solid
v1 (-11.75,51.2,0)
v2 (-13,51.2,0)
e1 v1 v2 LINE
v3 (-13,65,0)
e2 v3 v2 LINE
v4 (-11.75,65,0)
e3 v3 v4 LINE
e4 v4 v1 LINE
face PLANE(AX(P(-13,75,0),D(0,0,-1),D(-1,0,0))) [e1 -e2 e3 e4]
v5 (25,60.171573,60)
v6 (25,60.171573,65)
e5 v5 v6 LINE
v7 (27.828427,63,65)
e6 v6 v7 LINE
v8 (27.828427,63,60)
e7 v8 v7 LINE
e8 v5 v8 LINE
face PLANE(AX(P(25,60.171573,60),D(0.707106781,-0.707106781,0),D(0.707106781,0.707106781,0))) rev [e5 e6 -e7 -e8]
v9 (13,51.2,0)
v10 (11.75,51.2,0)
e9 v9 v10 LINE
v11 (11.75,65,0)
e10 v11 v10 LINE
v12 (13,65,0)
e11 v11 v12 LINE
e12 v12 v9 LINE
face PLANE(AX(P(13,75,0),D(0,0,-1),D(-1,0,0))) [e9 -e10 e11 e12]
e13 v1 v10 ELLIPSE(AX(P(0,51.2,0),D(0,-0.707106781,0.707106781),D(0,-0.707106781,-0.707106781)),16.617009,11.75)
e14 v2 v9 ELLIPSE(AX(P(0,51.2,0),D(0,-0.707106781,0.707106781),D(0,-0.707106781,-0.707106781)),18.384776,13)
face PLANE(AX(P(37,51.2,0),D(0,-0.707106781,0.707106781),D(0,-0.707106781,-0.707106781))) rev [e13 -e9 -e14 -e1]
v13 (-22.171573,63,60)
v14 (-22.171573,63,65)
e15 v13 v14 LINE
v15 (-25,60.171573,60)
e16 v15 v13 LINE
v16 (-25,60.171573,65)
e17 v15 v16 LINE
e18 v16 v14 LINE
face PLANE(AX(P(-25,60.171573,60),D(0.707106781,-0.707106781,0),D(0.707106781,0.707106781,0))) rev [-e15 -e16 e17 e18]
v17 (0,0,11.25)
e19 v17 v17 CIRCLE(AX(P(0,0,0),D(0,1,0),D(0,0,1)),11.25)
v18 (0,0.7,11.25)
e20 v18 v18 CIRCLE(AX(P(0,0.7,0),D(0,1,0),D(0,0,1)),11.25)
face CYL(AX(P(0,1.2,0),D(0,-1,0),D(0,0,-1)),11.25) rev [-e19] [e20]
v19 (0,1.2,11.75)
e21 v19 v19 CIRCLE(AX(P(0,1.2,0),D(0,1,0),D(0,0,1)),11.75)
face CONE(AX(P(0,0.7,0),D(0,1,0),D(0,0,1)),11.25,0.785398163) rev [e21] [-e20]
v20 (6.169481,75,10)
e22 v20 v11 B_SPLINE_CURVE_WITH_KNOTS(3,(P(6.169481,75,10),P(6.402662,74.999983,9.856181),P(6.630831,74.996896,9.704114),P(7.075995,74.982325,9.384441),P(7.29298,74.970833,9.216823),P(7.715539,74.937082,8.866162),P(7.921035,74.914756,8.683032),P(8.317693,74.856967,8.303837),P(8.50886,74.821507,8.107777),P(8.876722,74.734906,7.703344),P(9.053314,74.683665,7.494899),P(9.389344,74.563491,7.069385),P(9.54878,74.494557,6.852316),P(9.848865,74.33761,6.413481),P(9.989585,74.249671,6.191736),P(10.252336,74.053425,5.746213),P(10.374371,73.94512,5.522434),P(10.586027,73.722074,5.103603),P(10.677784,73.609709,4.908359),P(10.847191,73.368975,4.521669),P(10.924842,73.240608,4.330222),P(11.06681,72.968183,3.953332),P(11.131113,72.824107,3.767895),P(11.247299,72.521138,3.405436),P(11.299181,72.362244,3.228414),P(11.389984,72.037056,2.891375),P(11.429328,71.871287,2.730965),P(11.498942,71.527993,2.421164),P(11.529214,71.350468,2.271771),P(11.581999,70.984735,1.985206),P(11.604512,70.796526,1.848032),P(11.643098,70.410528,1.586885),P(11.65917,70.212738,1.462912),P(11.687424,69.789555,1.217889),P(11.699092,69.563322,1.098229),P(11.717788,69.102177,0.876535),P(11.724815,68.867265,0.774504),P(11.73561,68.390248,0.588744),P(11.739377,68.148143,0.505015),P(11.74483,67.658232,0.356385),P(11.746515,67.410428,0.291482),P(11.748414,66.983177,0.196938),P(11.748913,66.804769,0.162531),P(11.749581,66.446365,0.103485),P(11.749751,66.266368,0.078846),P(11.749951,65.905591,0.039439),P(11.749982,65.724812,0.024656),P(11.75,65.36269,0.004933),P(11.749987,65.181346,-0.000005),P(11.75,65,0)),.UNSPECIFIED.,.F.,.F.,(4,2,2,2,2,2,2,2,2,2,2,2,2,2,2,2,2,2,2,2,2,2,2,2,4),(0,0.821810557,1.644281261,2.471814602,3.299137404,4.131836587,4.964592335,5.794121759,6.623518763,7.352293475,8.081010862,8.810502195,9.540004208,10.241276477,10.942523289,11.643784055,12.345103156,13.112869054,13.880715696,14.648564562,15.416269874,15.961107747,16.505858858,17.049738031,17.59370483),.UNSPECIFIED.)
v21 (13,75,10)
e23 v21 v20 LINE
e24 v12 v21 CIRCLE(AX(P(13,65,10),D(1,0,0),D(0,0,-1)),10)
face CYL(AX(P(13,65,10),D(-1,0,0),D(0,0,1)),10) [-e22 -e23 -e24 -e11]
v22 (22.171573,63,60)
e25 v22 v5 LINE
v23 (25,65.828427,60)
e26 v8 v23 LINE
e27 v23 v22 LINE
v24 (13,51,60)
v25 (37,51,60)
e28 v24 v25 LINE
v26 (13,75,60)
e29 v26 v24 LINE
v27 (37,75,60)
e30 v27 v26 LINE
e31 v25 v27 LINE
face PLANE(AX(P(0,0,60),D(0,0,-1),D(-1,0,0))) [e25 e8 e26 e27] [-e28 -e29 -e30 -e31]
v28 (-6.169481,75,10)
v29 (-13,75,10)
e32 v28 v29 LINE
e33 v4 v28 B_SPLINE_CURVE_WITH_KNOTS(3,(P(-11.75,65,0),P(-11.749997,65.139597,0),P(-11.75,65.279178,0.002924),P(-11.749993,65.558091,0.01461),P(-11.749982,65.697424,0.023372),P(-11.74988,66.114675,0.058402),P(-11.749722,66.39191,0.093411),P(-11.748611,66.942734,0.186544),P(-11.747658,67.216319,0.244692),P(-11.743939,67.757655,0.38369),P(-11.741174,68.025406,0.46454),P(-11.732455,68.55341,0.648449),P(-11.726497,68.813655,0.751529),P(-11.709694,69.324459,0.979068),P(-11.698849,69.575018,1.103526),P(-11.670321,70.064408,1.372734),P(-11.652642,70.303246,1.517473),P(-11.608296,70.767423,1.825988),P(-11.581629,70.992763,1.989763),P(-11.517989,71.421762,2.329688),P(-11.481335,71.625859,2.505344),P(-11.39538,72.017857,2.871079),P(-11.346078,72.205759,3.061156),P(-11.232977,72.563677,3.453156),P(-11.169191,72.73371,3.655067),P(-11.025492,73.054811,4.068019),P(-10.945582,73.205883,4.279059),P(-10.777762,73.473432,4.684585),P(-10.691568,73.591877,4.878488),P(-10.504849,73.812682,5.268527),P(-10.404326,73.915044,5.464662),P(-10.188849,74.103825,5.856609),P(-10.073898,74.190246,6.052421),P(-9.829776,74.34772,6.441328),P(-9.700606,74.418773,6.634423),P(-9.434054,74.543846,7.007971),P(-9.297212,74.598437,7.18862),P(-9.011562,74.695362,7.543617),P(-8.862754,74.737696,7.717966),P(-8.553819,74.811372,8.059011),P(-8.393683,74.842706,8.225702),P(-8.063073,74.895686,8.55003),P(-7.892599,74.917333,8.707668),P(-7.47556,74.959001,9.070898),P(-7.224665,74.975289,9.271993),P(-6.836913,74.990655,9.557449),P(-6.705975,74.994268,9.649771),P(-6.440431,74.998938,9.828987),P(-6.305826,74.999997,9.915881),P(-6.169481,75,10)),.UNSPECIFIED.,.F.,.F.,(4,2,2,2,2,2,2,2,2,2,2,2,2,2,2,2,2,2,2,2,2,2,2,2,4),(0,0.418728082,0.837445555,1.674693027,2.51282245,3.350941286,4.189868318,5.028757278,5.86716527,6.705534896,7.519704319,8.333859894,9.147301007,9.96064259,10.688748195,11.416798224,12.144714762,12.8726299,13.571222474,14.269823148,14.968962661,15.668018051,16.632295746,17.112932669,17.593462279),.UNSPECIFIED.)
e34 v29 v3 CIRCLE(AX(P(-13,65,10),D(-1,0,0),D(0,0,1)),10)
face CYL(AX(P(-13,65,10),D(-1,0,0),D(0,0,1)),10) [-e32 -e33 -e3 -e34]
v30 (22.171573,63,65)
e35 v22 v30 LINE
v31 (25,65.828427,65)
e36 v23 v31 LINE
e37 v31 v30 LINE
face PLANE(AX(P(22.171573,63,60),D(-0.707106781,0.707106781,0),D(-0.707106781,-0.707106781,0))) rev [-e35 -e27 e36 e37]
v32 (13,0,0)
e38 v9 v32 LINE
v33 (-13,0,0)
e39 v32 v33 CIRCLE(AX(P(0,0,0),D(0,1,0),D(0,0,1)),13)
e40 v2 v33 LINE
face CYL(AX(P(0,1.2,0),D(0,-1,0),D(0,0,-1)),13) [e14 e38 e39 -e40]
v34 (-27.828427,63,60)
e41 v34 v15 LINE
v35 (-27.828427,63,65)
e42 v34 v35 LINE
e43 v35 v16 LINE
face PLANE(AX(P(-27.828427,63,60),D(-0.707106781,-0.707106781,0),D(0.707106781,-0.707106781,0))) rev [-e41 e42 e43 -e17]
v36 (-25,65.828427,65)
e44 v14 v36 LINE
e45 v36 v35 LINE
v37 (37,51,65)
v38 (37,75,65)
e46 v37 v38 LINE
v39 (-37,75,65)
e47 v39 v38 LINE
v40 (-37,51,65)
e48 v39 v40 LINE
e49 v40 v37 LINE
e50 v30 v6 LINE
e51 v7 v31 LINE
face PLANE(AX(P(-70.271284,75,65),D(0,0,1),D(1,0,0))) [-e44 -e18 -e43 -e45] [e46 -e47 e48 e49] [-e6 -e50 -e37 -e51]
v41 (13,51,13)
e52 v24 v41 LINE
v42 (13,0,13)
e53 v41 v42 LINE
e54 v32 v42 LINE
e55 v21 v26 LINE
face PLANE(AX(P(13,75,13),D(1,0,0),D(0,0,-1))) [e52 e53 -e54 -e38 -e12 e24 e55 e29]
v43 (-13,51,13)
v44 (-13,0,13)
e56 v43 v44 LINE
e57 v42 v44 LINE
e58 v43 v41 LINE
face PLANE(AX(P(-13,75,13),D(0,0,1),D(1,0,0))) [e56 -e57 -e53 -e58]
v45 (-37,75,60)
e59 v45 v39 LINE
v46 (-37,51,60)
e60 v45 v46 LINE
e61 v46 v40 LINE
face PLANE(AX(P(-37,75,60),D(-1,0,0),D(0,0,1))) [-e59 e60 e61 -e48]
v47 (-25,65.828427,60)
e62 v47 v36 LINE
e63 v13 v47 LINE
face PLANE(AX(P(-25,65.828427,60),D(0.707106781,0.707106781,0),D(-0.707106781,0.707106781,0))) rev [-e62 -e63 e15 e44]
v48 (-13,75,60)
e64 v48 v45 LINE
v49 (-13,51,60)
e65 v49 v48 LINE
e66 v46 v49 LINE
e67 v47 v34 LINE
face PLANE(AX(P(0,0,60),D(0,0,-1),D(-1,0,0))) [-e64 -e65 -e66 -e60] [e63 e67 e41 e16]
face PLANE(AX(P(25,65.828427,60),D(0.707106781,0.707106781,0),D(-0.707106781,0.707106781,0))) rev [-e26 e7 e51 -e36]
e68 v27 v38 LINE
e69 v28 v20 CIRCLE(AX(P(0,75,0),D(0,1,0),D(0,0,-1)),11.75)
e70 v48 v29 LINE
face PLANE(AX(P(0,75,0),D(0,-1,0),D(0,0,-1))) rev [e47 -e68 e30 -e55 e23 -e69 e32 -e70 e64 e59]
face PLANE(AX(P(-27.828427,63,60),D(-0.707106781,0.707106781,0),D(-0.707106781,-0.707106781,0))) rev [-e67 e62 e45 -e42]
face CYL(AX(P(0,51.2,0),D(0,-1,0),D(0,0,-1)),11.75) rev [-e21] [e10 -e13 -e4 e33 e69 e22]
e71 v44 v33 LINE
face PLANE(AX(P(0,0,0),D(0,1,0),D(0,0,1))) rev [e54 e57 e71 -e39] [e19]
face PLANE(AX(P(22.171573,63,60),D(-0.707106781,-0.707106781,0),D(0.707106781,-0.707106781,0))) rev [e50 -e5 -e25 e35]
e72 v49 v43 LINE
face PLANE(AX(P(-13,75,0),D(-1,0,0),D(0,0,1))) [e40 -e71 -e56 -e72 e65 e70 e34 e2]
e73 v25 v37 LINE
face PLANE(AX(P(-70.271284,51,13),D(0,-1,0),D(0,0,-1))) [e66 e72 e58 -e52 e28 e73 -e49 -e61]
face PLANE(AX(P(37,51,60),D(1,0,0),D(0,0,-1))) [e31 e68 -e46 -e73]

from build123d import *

# Parameters (mm, degrees)
SKETCH1_R           = 13
SKETCH1_R_2         = 11.25
BOSS_EXTRUDE1_DEPTH = 1.2
SKETCH2_R           = 13
SKETCH2_R_2         = 11.75
BOSS_EXTRUDE2_DEPTH = 50
CHAMFER1_SIZE       = 0.5
BOSS_EXTRUDE3_DEPTH = 75
SKETCH4_W           = 52
SKETCH4_H           = 24
BOSS_EXTRUDE4_DEPTH = 26
SKETCH5_W           = 24
SKETCH5_H           = 24
BOSS_EXTRUDE5_DEPTH = 5
CUT_EXTRUDE1_DEPTH  = 112.130553854
FILLET1_R           = 10


with BuildPart() as part:
    # Sketch1 → Boss-Extrude1 (new body)
    with BuildSketch(Plane(origin=(0, 0, 0), x_dir=(1, 0, 0), z_dir=(0, 1, 0))):
        with Locations(Location((0, 0, 0), (0, 0, 270))):
            Circle(SKETCH1_R)
        with Locations(Location((0, 0, 0), (0, 0, 270))):
            Circle(SKETCH1_R_2, mode=Mode.SUBTRACT)
    extrude(amount=BOSS_EXTRUDE1_DEPTH)

    # Sketch2 → Boss-Extrude2 (add)
    with BuildSketch(Plane(origin=(0, 1.2, 0), x_dir=(1, 0, 0), z_dir=(0, 1, 0))):
        with Locations(Location((0, 0, 0), (0, 0, 270))):
            Circle(SKETCH2_R)
        with Locations(Location((0, 0, 0), (0, 0, 270))):
            Circle(SKETCH2_R_2, mode=Mode.SUBTRACT)
    extrude(amount=BOSS_EXTRUDE2_DEPTH)

    # Chamfer1
    chamfer1_edges = [part.edges().sort_by_distance(p)[0] for p in [
        (0, 1.2, -11.25),
    ]]
    chamfer(chamfer1_edges, length=CHAMFER1_SIZE - 0.0001)  # a hair under: the kernel refuses the full size

    # Sketch3 → Boss-Extrude3 (add)
    with BuildSketch(Plane.XZ):
        with BuildLine():
            Line((-13, 0), (-13, 13))
            Line((-13, 13), (0, 13))
            Line((0, 13), (13, 13))
            Line((13, 13), (13, 0))
            Line((13, 0), (11.75, 0))
            ThreePointArc((11.75, 0), (0, 11.75), (-11.75, 0))
            Line((-11.75, 0), (-13, 0))
        make_face()
    extrude(amount=-BOSS_EXTRUDE3_DEPTH)

    # Sketch4 → Boss-Extrude4 (add)
    with BuildSketch(Plane(origin=(13, 0, 0), x_dir=(0, 0, -1), z_dir=(1, 0, 0))):
        with Locations((-39, 63)):
            Rectangle(SKETCH4_W, SKETCH4_H)
    extrude(amount=-BOSS_EXTRUDE4_DEPTH)

    # Sketch5 → Boss-Extrude5 (add)
    # profile 1 of 2: a face of its own
    with BuildSketch(Plane.XY.offset(65)):
        with Locations((-25, 63)):
            Rectangle(SKETCH5_W, SKETCH5_H)
        Polygon((-27.828427125, 63), (-25, 65.828427125), (-22.171572875, 63), (-25, 60.171572875), align=None, mode=Mode.SUBTRACT)
    # profile 2 of 2: a face of its own
    with BuildSketch(Plane.XY.offset(65)):
        with Locations((25, 63)):
            Rectangle(SKETCH5_W, SKETCH5_H)
        Polygon((22.171572875, 63), (25, 65.828427125), (27.828427125, 63), (25, 60.171572875), align=None, mode=Mode.SUBTRACT)
    extrude(amount=-BOSS_EXTRUDE5_DEPTH)

    # Sketch6 → Cut-Extrude1 (cut, through all)
    with BuildSketch(Plane.ZY.offset(13)):
        Polygon((0, 51.2), (-13, 38.2), (-13, 51.2), align=None)
    extrude(amount=-CUT_EXTRUDE1_DEPTH, mode=Mode.SUBTRACT)

    # Fillet1
    fillet1_edges = [part.edges().sort_by_distance(p)[0] for p in [
        (-12.375, 75, 0),
        (12.375, 75, 0),
    ]]
    fillet(fillet1_edges, radius=FILLET1_R)


solid = part.part
